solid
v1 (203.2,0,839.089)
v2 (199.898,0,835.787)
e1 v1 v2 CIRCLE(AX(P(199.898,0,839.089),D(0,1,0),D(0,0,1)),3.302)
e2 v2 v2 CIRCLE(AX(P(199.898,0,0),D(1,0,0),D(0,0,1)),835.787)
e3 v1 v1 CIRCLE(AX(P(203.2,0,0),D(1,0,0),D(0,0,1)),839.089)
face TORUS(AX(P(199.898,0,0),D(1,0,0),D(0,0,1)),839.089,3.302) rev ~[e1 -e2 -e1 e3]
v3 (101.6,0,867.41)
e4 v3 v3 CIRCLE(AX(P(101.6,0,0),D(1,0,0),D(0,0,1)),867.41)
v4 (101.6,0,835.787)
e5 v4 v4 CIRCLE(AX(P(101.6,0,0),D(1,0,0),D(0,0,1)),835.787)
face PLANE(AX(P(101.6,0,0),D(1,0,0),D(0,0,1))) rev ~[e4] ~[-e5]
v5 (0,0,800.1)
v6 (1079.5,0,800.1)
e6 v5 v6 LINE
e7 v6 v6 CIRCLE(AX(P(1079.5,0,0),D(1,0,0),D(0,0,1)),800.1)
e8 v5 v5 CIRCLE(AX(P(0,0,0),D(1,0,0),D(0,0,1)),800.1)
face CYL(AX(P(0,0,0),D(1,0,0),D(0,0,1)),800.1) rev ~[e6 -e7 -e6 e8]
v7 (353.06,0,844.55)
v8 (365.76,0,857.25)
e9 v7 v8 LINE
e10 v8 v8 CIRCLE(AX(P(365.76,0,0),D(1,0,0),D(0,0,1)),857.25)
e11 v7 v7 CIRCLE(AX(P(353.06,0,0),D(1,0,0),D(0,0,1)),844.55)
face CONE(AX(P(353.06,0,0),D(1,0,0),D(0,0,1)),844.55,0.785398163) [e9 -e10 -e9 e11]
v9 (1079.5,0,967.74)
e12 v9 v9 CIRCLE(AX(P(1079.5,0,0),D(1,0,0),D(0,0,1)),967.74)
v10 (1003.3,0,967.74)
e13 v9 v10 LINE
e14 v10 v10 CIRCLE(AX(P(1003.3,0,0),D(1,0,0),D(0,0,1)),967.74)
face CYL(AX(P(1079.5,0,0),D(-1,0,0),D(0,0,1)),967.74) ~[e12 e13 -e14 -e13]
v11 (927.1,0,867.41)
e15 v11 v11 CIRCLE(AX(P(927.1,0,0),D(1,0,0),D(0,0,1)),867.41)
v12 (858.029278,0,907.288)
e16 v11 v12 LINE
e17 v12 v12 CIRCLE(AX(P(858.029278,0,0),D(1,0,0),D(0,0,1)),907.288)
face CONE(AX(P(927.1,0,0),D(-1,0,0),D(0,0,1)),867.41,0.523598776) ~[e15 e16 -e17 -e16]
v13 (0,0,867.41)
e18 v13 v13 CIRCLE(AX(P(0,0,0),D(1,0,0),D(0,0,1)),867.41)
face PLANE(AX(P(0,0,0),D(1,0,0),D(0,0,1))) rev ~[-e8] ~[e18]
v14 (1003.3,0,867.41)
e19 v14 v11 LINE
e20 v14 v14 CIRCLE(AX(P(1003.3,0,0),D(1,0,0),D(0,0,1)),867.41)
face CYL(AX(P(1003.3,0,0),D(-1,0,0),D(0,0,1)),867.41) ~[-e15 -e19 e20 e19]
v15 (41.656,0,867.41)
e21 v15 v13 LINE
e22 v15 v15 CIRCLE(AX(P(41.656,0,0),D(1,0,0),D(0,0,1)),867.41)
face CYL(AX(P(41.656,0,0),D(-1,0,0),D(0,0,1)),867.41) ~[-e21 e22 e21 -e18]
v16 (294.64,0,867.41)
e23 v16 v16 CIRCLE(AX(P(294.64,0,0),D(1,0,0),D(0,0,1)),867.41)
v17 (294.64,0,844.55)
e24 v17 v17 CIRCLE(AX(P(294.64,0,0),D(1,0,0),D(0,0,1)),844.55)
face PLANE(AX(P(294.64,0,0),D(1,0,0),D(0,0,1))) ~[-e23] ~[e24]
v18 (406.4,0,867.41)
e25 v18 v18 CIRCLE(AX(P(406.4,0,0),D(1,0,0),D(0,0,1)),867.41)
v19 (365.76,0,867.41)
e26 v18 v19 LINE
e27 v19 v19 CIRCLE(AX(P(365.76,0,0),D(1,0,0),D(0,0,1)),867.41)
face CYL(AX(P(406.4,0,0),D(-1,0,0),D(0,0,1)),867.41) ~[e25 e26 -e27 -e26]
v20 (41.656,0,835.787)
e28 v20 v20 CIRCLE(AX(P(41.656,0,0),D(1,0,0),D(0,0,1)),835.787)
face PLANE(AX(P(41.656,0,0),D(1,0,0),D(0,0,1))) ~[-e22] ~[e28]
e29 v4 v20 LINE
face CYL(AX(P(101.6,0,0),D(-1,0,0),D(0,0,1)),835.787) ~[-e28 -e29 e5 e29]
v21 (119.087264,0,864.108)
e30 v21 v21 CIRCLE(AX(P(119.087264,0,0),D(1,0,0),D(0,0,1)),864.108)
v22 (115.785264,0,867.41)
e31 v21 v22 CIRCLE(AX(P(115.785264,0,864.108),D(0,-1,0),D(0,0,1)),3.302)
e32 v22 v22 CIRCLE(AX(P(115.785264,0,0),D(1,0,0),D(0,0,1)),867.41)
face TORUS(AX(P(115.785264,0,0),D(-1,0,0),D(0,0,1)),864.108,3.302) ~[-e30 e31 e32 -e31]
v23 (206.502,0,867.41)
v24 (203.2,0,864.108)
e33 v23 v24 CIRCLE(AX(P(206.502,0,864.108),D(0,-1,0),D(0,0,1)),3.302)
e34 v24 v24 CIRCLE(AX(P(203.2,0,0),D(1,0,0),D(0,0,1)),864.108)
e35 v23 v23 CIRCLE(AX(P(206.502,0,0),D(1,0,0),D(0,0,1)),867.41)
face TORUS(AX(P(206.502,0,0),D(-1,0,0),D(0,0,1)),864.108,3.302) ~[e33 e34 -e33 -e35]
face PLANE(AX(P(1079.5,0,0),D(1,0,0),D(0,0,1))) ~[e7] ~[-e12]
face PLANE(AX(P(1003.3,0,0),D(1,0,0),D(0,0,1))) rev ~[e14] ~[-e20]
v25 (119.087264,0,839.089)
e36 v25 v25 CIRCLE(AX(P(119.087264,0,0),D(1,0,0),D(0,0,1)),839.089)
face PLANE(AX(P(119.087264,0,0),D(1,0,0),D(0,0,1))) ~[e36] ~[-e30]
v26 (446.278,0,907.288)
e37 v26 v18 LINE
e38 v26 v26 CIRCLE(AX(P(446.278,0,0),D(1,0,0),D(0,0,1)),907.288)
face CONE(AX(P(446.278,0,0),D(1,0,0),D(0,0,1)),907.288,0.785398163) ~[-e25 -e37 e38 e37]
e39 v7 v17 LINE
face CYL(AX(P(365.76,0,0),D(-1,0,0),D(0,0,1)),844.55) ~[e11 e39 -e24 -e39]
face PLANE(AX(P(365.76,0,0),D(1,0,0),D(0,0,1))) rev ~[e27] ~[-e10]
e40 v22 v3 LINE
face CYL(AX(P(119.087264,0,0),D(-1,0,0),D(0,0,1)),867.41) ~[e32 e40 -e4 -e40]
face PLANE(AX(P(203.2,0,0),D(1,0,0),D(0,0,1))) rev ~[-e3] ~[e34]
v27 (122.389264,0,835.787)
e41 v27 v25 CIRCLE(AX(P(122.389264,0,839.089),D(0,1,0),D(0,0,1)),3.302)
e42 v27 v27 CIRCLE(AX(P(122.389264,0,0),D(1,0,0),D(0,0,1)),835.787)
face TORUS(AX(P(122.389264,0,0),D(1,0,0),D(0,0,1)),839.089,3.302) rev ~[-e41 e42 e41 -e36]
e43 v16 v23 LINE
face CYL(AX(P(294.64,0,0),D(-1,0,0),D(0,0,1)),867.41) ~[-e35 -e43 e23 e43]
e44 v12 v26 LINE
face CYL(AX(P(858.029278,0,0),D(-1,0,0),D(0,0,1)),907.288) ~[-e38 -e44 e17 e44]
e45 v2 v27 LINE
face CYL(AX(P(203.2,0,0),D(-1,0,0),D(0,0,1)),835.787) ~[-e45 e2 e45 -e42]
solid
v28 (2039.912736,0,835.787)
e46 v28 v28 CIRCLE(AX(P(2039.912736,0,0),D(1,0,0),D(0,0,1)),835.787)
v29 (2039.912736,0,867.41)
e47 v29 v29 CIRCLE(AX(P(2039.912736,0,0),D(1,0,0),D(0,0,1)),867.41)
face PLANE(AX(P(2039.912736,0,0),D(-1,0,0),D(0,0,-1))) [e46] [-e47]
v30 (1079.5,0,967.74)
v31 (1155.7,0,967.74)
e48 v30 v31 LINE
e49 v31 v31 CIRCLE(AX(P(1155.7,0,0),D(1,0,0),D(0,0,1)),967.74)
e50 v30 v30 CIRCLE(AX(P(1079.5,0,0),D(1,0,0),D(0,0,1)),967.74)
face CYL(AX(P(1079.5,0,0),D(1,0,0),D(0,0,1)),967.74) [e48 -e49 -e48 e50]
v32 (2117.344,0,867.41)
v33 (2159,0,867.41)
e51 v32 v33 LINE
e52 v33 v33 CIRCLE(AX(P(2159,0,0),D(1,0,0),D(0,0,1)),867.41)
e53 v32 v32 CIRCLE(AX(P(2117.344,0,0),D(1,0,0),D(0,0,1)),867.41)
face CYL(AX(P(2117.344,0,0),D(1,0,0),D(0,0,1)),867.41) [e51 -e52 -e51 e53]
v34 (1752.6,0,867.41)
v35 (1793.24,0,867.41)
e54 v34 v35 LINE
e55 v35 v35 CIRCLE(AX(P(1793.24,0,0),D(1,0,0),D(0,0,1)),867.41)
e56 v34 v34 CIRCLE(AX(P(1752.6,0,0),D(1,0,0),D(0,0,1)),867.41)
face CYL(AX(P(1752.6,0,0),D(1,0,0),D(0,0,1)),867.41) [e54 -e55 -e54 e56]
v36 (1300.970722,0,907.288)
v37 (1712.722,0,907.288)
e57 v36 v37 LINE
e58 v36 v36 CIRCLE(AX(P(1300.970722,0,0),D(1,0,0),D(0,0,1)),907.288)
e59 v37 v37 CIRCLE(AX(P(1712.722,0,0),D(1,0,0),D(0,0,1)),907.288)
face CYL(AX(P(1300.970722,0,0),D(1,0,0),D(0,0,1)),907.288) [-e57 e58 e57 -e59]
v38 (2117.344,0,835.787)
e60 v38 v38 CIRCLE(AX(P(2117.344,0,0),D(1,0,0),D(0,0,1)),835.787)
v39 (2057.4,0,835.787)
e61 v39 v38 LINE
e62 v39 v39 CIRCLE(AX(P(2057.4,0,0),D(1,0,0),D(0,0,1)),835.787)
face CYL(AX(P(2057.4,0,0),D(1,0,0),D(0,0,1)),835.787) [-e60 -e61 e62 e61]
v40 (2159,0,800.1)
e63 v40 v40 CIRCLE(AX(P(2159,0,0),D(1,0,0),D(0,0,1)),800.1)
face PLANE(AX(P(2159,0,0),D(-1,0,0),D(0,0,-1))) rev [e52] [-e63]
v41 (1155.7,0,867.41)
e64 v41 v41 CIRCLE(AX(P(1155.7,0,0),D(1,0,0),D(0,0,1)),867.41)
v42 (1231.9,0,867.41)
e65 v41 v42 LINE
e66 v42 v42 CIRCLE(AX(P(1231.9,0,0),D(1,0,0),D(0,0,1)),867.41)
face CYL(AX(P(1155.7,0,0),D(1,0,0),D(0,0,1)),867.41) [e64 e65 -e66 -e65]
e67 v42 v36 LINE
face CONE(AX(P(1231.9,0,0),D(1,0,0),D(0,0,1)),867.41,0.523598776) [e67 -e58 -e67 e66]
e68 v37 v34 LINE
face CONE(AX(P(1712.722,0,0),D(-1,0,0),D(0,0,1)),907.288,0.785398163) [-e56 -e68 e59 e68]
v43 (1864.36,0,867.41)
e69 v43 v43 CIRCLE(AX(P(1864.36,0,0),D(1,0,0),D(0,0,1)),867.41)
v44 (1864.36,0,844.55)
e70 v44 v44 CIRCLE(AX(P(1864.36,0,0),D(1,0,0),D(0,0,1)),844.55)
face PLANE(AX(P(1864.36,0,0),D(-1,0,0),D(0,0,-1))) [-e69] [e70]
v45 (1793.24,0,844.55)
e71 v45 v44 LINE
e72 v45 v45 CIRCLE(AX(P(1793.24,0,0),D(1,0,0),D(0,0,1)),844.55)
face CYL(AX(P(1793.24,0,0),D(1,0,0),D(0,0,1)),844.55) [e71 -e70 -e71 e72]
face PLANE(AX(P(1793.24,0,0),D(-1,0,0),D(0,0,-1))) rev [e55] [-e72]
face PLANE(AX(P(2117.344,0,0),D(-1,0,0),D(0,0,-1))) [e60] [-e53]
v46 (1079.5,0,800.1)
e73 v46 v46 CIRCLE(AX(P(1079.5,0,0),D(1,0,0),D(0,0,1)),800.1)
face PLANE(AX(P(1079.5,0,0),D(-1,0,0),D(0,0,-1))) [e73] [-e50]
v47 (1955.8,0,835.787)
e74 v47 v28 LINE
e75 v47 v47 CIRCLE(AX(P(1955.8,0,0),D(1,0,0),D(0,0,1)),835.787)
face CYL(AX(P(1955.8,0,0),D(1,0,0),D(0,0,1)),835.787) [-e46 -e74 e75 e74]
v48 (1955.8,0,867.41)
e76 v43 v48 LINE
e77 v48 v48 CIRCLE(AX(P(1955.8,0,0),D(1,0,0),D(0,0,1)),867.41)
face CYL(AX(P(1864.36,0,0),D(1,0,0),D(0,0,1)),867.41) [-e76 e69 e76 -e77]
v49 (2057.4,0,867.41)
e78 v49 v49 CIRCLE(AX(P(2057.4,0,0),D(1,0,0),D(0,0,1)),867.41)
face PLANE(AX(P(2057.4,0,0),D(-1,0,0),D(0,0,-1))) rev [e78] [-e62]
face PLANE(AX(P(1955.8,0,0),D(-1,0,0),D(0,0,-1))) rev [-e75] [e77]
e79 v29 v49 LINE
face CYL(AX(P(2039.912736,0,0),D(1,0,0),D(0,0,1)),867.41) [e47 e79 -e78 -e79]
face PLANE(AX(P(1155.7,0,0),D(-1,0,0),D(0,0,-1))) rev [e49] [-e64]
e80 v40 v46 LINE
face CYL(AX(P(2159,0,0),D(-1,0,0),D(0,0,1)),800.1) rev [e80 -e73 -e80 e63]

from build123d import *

# Parameters (mm, degrees)
F2_R    = 3.302
F3_SIZE = 12.7


# Not quite as in the source:
# - a pattern or mirror of a feature is missing from the dataset's text; its kind, count and spacing are read off the source's solid


with BuildPart() as f1:
    # F0 (on Front) → F1 (revolve)
    with BuildSketch(Plane.XZ):
        Polygon((41.656, 867.41), (0, 867.41), (0, 800.1), (1079.5, 800.1), (1079.5, 967.74), (1003.3, 967.74), (1003.3, 867.41), (927.1, 867.41), (858.0292778958, 907.288), (446.278, 907.288), (406.4, 867.41), (365.76, 867.41), (365.76, 844.55), (294.64, 844.55), (294.64, 867.41), (203.2, 867.41), (203.2, 835.787), (119.0872639418, 835.787), (119.0872639418, 867.41), (101.6, 867.41), (101.6, 835.787), (41.656, 835.787), align=None)
    revolve(axis=Axis((836.0699839478, 0, 0), (1, 0, 0)))


with BuildPart() as f1_copies_1:
    # F1_copies: instance of F1
    add(f1.part.mirror(Plane(origin=(1079.5, 0, 0), x_dir=(0, 0, 1), z_dir=(1, 0, 0))))


with BuildPart() as f1_1:
    add(f1.part)

    # F2
    f2_edges = [f1_1.edges().sort_by_distance(p)[0] for p in [
        (203.2, 0, -867.41),
        (203.2, 0, -835.787),
        (119.087264, 0, -867.41),
        (119.087264, 0, -835.787),
    ]]
    fillet(f2_edges, radius=F2_R)

    # F3
    f3_edges = [f1_1.edges().sort_by_distance(p)[0] for p in [
        (365.76, 0, -844.55),
    ]]
    chamfer(f3_edges, length=F3_SIZE)


solid = Compound([f1_copies_1.part, f1_1.part])
